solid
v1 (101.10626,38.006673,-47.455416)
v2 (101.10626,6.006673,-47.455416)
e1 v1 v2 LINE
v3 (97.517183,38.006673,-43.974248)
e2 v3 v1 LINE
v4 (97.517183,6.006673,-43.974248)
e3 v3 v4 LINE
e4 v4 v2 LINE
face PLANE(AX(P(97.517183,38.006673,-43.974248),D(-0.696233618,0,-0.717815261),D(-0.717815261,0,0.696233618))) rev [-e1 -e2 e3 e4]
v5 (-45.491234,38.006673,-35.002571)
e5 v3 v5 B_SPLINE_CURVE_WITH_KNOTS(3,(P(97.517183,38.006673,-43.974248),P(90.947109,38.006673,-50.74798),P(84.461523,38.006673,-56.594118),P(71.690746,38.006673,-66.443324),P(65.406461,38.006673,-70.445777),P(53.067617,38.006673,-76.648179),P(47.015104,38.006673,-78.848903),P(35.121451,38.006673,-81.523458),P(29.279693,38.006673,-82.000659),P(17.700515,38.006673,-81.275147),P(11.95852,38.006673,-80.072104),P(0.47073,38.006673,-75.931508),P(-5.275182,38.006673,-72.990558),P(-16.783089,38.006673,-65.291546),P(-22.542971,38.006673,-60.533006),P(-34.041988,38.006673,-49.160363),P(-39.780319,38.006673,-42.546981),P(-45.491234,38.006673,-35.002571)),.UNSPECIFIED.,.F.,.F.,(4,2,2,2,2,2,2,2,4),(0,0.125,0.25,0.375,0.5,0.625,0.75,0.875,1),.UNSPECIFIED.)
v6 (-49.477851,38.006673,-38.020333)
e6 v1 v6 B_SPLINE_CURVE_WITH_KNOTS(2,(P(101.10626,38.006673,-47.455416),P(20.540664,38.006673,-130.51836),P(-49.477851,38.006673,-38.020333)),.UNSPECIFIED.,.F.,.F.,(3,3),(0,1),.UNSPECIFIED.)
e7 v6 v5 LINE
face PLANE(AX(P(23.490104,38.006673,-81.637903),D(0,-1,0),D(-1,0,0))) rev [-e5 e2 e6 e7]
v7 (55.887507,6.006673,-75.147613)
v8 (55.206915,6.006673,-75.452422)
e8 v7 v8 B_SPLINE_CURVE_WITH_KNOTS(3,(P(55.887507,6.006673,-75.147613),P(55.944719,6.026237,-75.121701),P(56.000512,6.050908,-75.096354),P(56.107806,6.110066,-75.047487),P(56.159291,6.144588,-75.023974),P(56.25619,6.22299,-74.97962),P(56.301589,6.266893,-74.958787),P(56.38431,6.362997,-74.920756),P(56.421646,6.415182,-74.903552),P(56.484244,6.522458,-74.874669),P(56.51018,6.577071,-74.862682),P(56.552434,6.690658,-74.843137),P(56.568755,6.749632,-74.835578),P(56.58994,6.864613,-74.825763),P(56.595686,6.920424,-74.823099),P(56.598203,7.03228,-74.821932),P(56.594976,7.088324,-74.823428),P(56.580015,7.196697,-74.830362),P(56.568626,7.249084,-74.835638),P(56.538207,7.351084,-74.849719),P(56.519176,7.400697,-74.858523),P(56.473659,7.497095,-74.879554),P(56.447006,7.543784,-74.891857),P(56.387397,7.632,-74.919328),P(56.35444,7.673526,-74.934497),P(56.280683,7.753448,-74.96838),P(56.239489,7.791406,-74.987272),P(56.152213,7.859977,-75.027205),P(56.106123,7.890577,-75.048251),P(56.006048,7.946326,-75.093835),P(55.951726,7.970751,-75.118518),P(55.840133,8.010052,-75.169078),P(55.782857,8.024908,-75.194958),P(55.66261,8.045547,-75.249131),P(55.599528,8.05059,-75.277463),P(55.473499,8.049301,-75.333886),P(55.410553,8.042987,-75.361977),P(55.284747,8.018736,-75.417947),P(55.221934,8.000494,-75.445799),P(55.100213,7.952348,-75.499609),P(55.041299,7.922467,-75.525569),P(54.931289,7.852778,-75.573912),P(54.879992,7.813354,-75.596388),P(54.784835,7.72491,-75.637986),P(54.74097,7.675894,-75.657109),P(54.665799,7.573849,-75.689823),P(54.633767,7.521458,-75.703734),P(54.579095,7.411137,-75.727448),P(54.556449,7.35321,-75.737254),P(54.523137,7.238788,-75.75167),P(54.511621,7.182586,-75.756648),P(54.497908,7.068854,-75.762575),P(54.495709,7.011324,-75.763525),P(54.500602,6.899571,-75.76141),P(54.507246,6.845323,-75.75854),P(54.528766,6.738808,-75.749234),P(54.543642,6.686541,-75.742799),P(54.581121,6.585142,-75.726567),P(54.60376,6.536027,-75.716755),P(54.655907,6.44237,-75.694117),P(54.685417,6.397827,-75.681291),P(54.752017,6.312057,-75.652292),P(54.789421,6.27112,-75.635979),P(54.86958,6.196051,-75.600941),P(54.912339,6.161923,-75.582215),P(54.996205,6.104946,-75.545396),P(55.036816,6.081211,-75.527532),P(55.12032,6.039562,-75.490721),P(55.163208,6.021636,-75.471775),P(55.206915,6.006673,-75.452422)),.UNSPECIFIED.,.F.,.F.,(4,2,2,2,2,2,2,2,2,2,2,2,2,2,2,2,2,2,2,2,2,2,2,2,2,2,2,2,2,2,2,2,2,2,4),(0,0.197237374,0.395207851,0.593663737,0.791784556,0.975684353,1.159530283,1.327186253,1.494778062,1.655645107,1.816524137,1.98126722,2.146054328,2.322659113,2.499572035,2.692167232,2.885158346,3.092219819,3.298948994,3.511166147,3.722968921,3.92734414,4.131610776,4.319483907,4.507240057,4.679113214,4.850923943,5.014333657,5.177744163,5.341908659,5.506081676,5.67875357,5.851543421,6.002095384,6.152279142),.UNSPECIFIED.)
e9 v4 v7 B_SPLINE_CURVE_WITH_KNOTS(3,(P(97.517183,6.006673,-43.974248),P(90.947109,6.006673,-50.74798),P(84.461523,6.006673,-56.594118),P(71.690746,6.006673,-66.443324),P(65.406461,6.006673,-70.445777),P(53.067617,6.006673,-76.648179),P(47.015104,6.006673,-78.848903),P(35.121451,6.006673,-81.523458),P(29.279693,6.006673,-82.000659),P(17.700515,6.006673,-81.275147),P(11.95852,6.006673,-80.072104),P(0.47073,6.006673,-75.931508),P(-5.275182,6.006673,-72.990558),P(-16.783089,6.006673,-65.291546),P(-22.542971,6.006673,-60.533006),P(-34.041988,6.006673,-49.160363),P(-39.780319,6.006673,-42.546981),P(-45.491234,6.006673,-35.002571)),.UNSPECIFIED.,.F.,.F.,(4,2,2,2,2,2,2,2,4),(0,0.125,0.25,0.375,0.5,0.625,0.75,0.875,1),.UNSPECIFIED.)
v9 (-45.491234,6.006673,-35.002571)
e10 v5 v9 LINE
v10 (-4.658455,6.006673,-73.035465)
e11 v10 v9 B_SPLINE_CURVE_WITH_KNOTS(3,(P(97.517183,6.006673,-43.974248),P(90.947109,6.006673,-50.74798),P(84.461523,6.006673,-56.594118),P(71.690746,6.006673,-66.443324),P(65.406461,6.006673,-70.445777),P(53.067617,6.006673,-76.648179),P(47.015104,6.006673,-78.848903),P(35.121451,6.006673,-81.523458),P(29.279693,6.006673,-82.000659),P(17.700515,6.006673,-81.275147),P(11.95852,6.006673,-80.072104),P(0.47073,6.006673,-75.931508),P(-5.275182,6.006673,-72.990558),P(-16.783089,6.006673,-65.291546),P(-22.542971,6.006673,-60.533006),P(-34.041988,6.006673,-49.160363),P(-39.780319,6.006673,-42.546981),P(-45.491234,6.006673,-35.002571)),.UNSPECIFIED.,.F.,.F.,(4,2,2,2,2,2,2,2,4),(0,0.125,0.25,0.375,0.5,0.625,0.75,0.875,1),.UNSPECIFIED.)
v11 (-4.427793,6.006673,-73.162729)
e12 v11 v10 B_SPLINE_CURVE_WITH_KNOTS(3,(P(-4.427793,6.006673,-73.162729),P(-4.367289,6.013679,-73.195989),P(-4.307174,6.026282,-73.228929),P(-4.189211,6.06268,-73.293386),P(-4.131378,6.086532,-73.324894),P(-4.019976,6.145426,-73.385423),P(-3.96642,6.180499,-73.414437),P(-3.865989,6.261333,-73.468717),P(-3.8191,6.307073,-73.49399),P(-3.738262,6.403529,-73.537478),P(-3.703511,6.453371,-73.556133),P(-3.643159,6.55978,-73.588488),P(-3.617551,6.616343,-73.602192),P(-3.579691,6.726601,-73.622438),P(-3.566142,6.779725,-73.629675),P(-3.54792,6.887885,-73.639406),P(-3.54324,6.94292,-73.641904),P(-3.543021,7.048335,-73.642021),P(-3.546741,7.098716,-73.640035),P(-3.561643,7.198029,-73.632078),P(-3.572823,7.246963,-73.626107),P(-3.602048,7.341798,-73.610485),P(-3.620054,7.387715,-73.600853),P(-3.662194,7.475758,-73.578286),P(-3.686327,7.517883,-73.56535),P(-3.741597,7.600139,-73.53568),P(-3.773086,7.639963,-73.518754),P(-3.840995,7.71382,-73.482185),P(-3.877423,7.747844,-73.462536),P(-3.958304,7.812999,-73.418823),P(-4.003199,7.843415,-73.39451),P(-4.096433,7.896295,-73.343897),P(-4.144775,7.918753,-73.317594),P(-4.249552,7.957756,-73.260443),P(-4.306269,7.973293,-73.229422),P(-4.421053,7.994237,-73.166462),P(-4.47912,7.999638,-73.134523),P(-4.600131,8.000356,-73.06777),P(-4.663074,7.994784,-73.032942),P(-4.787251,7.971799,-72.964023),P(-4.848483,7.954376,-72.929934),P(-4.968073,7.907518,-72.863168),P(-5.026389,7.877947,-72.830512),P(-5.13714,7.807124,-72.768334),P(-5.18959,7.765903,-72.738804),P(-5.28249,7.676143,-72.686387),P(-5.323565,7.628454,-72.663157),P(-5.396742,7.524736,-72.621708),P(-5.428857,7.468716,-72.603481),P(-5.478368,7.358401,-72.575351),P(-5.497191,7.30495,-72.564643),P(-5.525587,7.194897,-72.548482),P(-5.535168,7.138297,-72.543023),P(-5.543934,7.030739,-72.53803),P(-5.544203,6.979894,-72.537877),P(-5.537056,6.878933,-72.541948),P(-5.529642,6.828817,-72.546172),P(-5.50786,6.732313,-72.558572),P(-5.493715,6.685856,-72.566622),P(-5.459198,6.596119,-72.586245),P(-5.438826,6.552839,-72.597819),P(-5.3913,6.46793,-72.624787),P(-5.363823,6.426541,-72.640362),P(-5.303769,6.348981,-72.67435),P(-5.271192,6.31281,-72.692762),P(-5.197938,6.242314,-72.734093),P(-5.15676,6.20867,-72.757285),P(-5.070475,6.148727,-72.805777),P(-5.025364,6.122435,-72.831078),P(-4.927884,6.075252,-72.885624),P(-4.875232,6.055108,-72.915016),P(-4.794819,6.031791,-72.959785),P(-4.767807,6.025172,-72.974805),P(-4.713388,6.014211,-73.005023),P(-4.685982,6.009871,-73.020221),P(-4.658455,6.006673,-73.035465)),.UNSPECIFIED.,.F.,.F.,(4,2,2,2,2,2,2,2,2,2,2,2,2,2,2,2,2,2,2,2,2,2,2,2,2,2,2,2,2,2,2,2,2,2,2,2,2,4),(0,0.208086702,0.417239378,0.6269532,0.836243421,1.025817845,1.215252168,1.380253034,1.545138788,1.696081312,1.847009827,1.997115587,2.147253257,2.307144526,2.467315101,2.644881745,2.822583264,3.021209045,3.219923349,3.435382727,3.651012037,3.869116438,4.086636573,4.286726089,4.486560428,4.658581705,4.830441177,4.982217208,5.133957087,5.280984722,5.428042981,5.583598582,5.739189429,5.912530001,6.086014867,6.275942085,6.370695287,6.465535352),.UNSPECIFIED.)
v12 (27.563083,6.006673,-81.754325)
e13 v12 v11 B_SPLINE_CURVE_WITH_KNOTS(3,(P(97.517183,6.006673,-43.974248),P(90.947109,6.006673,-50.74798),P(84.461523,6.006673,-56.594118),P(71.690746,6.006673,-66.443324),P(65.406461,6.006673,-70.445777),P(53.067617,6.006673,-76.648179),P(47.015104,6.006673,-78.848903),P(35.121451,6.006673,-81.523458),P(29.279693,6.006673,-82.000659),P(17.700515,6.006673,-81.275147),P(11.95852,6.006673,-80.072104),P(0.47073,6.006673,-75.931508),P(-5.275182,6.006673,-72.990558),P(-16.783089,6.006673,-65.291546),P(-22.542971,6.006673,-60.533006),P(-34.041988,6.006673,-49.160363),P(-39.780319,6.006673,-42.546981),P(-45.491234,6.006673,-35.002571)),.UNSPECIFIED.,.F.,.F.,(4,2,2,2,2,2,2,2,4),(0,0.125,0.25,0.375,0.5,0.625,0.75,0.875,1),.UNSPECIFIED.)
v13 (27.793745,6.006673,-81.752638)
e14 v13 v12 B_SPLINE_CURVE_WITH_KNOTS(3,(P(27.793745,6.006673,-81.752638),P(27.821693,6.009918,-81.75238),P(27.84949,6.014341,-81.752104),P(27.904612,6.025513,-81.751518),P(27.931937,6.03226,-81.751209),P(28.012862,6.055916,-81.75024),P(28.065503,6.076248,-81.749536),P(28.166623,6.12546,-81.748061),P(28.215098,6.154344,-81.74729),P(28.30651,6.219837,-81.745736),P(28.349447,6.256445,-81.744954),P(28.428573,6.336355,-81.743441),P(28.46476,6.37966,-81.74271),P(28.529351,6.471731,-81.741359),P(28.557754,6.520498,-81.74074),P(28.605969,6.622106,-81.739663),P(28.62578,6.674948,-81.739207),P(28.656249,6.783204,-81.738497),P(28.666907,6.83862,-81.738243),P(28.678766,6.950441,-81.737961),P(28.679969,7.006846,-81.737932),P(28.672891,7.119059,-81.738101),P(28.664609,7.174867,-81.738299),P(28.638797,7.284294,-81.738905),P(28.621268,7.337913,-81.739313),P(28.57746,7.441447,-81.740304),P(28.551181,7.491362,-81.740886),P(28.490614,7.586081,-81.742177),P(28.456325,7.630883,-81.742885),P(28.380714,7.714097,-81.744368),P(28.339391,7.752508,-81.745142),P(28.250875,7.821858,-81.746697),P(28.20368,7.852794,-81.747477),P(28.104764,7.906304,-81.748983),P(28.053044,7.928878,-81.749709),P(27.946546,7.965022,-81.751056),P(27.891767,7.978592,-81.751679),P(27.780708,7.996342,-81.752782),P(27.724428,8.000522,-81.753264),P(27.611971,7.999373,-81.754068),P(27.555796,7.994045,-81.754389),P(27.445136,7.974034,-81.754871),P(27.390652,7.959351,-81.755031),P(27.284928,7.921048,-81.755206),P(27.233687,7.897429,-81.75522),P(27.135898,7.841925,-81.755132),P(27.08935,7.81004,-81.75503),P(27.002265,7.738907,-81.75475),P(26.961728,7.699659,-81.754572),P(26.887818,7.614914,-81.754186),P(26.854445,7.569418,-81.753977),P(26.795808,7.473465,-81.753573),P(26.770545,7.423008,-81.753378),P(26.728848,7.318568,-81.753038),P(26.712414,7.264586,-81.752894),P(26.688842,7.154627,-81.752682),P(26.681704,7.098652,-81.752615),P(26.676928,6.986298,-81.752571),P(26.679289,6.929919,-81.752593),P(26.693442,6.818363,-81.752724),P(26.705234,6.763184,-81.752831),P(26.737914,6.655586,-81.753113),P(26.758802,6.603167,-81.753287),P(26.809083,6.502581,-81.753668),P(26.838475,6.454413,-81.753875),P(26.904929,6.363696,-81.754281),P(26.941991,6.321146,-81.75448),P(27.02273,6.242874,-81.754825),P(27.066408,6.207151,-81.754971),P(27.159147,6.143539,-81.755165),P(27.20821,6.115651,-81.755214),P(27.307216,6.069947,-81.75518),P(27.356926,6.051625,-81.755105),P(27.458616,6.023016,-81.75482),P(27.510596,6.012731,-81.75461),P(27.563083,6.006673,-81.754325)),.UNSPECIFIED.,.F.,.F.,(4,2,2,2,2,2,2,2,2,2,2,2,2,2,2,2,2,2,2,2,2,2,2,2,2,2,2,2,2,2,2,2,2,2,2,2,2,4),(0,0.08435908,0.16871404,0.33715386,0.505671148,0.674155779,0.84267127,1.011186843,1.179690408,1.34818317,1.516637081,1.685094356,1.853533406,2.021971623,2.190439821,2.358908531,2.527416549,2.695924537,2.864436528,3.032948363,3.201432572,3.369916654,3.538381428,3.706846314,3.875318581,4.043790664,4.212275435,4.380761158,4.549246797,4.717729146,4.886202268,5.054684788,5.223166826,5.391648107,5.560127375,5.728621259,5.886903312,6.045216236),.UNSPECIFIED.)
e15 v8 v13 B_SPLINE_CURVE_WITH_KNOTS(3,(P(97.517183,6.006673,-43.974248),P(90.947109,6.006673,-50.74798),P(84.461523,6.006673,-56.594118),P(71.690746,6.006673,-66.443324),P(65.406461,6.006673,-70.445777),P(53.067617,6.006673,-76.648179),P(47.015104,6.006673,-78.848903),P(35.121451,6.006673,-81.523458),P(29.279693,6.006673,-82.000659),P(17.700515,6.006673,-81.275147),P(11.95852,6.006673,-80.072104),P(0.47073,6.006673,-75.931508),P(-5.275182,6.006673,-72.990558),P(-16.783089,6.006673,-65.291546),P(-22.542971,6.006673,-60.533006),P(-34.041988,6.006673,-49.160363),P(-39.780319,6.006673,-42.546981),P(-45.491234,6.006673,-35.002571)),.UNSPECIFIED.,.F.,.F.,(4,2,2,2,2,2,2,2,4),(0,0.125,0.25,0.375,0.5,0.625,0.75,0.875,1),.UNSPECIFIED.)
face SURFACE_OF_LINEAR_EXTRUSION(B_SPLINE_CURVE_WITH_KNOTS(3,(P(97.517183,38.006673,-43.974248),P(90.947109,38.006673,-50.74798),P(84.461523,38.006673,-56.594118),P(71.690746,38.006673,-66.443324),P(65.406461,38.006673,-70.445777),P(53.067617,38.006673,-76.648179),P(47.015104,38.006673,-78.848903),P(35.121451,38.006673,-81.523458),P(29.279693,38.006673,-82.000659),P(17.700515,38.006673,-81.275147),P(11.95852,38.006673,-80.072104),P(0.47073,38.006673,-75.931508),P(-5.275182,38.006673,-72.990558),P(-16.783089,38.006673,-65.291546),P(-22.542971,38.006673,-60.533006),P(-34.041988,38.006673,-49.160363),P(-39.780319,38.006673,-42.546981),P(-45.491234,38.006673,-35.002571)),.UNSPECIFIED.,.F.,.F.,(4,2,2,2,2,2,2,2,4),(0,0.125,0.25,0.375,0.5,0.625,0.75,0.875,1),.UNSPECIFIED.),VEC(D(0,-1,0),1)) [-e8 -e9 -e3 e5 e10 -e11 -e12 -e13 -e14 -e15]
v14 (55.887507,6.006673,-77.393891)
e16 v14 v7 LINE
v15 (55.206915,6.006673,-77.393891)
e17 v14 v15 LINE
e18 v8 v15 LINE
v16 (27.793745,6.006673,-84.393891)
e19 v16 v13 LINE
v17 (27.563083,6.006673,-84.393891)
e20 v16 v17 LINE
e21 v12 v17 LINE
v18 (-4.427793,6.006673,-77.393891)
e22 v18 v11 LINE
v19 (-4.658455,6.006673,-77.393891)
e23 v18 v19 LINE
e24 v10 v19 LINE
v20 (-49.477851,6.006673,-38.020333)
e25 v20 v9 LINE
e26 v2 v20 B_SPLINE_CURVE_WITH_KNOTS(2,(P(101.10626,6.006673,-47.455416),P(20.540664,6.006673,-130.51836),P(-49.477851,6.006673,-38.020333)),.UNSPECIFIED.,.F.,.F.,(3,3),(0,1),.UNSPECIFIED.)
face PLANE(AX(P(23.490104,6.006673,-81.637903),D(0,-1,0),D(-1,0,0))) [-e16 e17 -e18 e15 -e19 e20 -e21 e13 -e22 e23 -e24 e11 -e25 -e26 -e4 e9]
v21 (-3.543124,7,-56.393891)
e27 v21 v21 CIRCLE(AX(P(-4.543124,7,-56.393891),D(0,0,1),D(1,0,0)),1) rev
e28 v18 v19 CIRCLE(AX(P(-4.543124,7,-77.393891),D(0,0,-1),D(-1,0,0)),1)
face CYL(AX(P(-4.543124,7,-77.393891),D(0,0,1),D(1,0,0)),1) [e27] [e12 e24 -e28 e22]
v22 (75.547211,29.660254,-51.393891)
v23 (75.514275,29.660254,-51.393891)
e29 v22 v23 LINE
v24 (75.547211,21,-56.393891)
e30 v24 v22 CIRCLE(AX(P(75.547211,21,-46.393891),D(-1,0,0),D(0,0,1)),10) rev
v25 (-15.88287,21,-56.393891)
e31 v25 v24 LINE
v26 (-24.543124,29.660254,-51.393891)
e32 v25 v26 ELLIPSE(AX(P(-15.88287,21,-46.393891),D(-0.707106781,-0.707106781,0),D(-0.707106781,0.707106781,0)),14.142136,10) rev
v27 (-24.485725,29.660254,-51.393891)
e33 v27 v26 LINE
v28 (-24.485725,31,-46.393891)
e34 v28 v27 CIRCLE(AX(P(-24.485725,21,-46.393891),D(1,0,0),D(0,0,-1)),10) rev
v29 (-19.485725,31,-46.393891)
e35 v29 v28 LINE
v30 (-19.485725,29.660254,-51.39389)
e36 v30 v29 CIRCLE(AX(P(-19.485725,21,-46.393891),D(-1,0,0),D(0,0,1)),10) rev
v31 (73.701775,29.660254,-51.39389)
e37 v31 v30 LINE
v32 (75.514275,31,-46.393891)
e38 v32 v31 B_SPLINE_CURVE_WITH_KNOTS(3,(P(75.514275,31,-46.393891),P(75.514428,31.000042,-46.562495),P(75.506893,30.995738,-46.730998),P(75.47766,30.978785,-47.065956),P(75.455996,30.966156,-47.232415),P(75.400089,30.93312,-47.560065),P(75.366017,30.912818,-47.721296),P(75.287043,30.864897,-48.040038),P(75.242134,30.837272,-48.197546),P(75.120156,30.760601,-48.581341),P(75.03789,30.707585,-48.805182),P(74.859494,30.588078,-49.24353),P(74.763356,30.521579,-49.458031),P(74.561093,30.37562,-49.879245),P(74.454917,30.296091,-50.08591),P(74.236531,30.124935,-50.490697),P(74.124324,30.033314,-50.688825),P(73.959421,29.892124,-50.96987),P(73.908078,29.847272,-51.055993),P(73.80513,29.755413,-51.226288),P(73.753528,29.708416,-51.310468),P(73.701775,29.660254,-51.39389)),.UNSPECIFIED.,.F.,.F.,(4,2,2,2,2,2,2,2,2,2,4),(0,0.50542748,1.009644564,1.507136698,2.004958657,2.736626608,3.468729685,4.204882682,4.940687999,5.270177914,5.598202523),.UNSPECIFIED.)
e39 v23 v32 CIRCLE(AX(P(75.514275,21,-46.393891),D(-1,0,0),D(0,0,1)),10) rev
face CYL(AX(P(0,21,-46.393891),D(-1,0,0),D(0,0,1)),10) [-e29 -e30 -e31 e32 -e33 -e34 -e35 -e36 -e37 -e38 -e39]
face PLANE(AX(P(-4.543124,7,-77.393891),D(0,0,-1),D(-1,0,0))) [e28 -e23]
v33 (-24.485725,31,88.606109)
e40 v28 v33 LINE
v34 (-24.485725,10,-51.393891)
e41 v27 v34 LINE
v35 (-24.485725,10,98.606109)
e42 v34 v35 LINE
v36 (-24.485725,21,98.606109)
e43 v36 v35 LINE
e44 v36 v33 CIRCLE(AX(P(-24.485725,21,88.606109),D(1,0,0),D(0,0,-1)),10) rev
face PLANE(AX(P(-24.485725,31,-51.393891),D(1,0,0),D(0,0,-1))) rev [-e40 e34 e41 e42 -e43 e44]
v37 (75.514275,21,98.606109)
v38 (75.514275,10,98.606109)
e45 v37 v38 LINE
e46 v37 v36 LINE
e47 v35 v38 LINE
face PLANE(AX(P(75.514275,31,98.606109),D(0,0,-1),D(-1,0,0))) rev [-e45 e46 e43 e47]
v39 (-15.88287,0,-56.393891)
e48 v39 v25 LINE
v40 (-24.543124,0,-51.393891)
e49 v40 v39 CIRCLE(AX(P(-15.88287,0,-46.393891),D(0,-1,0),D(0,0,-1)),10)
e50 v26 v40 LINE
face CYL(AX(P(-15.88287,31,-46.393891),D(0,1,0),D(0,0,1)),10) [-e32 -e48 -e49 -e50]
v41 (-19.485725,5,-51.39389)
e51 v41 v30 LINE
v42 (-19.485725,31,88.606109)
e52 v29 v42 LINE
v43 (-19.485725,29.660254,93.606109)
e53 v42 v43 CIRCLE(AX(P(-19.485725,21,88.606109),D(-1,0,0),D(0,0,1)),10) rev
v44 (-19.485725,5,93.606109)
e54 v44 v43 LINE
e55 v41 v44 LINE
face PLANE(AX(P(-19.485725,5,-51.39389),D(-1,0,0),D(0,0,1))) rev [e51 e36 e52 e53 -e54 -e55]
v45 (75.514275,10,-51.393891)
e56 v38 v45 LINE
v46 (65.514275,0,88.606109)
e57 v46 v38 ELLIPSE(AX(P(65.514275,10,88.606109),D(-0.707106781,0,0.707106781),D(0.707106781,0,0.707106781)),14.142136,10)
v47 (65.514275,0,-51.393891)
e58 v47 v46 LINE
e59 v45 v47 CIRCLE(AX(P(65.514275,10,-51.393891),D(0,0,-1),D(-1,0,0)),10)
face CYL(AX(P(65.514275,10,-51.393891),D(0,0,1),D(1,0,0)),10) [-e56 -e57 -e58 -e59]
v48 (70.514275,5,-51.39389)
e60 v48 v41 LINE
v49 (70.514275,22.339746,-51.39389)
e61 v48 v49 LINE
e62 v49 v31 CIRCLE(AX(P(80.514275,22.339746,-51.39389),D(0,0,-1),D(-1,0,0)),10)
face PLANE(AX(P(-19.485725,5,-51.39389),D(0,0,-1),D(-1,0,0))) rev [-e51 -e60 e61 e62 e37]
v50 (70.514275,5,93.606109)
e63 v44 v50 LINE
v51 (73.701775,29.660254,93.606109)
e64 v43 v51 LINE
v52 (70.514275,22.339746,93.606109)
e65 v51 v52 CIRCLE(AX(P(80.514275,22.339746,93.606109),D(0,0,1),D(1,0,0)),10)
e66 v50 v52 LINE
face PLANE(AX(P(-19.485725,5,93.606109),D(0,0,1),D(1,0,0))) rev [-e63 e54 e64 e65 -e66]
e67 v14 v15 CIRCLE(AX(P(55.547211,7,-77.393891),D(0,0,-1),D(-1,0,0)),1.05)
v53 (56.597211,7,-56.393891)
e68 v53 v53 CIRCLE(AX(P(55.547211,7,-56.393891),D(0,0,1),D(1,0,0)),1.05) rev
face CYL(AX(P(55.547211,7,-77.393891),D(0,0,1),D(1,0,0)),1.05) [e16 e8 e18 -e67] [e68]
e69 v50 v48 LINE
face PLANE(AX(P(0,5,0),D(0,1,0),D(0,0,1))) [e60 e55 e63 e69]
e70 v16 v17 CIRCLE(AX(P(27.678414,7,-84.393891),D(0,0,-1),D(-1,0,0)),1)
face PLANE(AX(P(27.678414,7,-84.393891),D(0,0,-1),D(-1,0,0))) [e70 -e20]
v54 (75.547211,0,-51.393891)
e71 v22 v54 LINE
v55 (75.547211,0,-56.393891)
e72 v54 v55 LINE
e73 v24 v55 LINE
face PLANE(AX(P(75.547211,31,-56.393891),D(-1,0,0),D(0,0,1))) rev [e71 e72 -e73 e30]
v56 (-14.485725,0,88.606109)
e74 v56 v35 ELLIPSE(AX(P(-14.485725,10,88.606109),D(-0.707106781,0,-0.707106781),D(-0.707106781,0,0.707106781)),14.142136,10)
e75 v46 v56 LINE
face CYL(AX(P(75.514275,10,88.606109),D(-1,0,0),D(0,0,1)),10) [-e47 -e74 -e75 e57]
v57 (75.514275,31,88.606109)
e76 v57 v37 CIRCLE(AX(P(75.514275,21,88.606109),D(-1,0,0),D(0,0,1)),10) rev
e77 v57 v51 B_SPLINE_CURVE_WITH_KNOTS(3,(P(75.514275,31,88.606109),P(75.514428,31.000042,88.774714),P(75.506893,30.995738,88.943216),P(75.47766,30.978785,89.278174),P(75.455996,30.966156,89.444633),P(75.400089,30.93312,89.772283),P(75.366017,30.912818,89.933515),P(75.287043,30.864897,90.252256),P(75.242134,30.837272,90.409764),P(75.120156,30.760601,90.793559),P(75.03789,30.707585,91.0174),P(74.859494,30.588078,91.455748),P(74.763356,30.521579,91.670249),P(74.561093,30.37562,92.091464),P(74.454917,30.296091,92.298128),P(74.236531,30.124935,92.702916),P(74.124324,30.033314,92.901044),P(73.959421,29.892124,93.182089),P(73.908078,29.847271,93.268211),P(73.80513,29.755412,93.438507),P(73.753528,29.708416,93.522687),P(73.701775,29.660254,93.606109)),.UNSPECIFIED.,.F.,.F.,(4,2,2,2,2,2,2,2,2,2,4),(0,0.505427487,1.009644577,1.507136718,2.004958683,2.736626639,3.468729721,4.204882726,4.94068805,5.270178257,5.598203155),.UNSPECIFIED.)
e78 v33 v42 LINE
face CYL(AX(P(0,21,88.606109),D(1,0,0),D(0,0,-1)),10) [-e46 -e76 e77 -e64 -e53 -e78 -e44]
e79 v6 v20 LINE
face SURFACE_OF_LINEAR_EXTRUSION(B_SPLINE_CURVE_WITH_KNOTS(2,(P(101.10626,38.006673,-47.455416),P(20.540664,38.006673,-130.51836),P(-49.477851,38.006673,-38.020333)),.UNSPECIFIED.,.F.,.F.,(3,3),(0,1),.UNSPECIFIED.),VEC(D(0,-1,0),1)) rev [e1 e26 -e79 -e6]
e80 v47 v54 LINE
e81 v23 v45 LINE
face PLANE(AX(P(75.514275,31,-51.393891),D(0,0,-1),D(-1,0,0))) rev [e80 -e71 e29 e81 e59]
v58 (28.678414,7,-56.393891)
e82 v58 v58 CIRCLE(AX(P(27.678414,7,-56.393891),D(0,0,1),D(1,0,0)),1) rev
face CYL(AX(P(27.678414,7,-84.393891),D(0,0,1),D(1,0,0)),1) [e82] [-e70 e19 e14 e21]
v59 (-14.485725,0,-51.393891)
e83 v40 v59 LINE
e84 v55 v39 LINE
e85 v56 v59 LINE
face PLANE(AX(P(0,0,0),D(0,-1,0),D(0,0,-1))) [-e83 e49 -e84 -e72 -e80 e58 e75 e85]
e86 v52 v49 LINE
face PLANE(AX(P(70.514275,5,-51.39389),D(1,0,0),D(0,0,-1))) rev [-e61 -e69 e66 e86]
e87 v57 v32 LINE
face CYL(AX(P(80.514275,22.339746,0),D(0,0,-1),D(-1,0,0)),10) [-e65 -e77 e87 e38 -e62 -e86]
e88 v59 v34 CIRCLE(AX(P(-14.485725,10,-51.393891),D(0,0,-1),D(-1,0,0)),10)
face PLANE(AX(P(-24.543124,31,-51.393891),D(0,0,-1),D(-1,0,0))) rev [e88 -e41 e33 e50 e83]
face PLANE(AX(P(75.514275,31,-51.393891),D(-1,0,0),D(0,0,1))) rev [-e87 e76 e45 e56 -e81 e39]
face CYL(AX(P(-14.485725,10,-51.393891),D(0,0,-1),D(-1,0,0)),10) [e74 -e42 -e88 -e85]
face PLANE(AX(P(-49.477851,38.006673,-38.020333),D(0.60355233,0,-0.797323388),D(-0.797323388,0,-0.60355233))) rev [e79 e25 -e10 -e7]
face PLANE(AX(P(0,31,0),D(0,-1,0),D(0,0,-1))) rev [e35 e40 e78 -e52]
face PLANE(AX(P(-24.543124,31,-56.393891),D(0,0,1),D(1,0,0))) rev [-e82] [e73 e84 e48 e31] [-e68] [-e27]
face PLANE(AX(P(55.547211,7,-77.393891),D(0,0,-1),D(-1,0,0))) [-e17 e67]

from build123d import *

# Parameters (mm, degrees)
BOSS_EXTRUDE1_DEPTH = 31
SKETCH5_W           = 90
SKETCH5_H           = 144.999999519
CUT_EXTRUDE2_DEPTH  = 26
SKETCH10_R          = 1.05
SKETCH10_R_2        = 1
BOSS_EXTRUDE3_DEPTH = 21
EXTRUDE_THIN2_START = -32
EXTRUDE_THIN2_DEPTH = 32
FILLET2_R           = 10
FILLET4_R           = 10
FILLET5_R           = 10
FILLET6_R           = 10
SKETCH15_R          = 1
BOSS_EXTRUDE4_DEPTH = 28


# Read off the part's stored shape, not the designer's step: Extrude-Thin2
with BuildPart() as part:
    # Sketch4 → Boss-Extrude1 (new body)
    with BuildSketch(Plane(origin=(0, 0, 0), x_dir=(1, 0, 0), z_dir=(0, 1, 0))):
        Polygon((-24.543123589, 51.393890829), (-24.485724986, 51.393890829), (-24.485724986, -98.606109173), (75.514275014, -98.606109173), (75.514275014, 51.393890827), (75.547211032, 51.393890827), (75.547211032, 56.393890829), (-24.543123589, 56.393890829), align=None)
    extrude(amount=BOSS_EXTRUDE1_DEPTH)

    # Sketch5 → Cut-Extrude2 (cut)
    with BuildSketch(Plane(origin=(0, 31, 0), x_dir=(1, 0, 0), z_dir=(0, 1, 0))):
        with Locations((25.514275014, -21.106109414)):
            Rectangle(SKETCH5_W, SKETCH5_H)
    extrude(amount=-CUT_EXTRUDE2_DEPTH, mode=Mode.SUBTRACT)

    # Sketch10 → Boss-Extrude3 (add)
    with BuildSketch(Plane(origin=(0, 0, -56.393890829), x_dir=(-1, 0, 0), z_dir=(0, 0, -1))):
        with Locations(Location((-55.547211032, 7, 0), (0, 0, 180))):
            Circle(SKETCH10_R)
        with Locations(Location((4.543123589, 7, 0), (0, 0, 180))):
            Circle(SKETCH10_R_2)
    extrude(amount=BOSS_EXTRUDE3_DEPTH)

    # Fillet2
    # the kernel refuses this fillet: 10 mm, written as the material it takes off along each edge
    with BuildSketch(Plane(origin=(-49.485724986, 31, 98.606109173), x_dir=(0, 0, -1), z_dir=(1, 0, 0))) as fillet2_piece_1:
        with BuildLine():
            CenterArc((FILLET2_R, -FILLET2_R), FILLET2_R, 90, 90)
            Line((0, -FILLET2_R), (0, 0))
            Line((0, 0), (FILLET2_R, 0))
        make_face()
    extrude(amount=150, mode=Mode.SUBTRACT)
    with BuildSketch(Plane(origin=(-24.485724986, 0, -51.393890829), x_dir=(0, 1, 0), z_dir=(0, 0, 1))) as fillet2_piece_2:
        with BuildLine():
            CenterArc((FILLET2_R, -FILLET2_R), FILLET2_R, 90, 90)
            Line((0, -FILLET2_R), (0, 0))
            Line((0, 0), (FILLET2_R, 0))
        make_face()
    extrude(amount=175.000000002, mode=Mode.SUBTRACT)
    with BuildSketch(Plane(origin=(-49.485724986, 0, 98.606109173), x_dir=(0, 0, -1), z_dir=(1, 0, 0))) as fillet2_piece_3:
        with BuildLine():
            CenterArc((FILLET2_R, FILLET2_R), FILLET2_R, 180, 90)
            Line((0, FILLET2_R), (0, 0))
            Line((0, 0), (FILLET2_R, 0))
        make_face()
    extrude(amount=150, mode=Mode.SUBTRACT)
    with BuildSketch(Plane(origin=(75.514275014, 0, 123.606109173), x_dir=(-1, 0, 0), z_dir=(0, 0, -1))) as fillet2_piece_4:
        with BuildLine():
            CenterArc((FILLET2_R, FILLET2_R), FILLET2_R, 180, 90)
            Line((0, FILLET2_R), (0, 0))
            Line((0, 0), (FILLET2_R, 0))
        make_face()
    extrude(amount=175, mode=Mode.SUBTRACT)

    # Fillet4
    # the kernel refuses this fillet: 10 mm, written as the material it takes off along each edge
    with BuildSketch(Plane(origin=(70.514275014, 31, -73.044525441), x_dir=(0, -1, 0), z_dir=(0, 0, 1))) as fillet4_piece_1_section:
        with BuildLine():
            CenterArc((8.660254038, 10), FILLET4_R, 210, 60)
            Line((0, 5), (0, 0))
            Line((0, 0), (8.660254038, 0))
        make_face()
    fillet4_piece_1 = extrude(amount=183.301269709, mode=Mode.PRIVATE)
    fillet4_piece_1 = split(fillet4_piece_1, bisect_by=Plane(origin=(71.836700468, 27.349745962, -51.393890827), z_dir=(0, 0, 1)), keep=Keep.TOP, mode=Mode.PRIVATE)
    fillet4_piece_1 = split(fillet4_piece_1, bisect_by=Plane(origin=(71.836700468, 27.349745962, 93.606109173), z_dir=(0, 0, -1)), keep=Keep.TOP, mode=Mode.PRIVATE)
    add(fillet4_piece_1, mode=Mode.SUBTRACT)

    # Fillet5
    # the kernel refuses this fillet: 10 mm, written as the material it takes off along each edge
    with BuildSketch(Plane(origin=(100.547211032, 31, -56.393890829), x_dir=(0, -1, 0), z_dir=(-1, 0, 0))) as fillet5_piece_1:
        with BuildLine():
            CenterArc((FILLET5_R, FILLET5_R), FILLET5_R, 180, 90)
            Line((0, FILLET5_R), (0, 0))
            Line((0, 0), (FILLET5_R, 0))
        make_face()
    extrude(amount=150.090334621, mode=Mode.SUBTRACT)

    # Fillet6
    # the kernel refuses this fillet: 10 mm, written as the material it takes off along each edge
    with BuildSketch(Plane(origin=(-24.543123589, -21.650635095, -56.393890829), x_dir=(0, 0, 1), z_dir=(0, 1, 0))) as fillet6_piece_1:
        with BuildLine():
            CenterArc((10, 8.660254038), FILLET6_R, 180, 60)
            Line((0, 8.660254038), (-0.2, 8.660254038))
            Line((-0.2, 8.660254038), (-0.2, 0))
            Line((-0.2, 0), (0, -0.2))
            ThreePointArc((0, -0.2), (2.5, -0.2), (4.9, -0.173205081))
            Line((4.9, -0.173205081), (5, 0))
        make_face()
    extrude(amount=64.301270189, mode=Mode.SUBTRACT)



with BuildPart() as body_2:
    # Extrude-Thin2 outline → Extrude-Thin2 (new body)
    with BuildSketch(Plane(origin=(0, 6.00667288, 0), x_dir=(-1, 0, 0), z_dir=(0, -1, 0)).offset(EXTRUDE_THIN2_START)):
        with BuildLine():
            Line((-101.106259616, 47.455416484), (-97.517183312, 43.974248393))
            add(Edge.make_bspline(
                [(-97.517183312, 43.974248393), (-90.947109033, 50.747979881), (-84.461523265, 56.594117718), (-71.690746068, 66.443323609), (-65.406461275, 70.445777381), (-53.067617331, 76.648178617), (-47.015104027, 78.848903051), (-35.121450693, 81.523458331), (-29.279693001, 82.000658953), (-17.700514878, 81.275147368), (-11.958520381, 80.072104414), (-0.470729692, 75.931508258), (5.275181576, 72.990557795), (16.783088845, 65.291546287), (22.542970532, 60.533005936), (34.041987864, 49.160363108), (39.780319498, 42.546980543), (45.491234369, 35.002570947)],
                knots=[0, 0, 0, 0, 0.125, 0.125, 0.25, 0.25, 0.375, 0.375, 0.5, 0.5, 0.625, 0.625, 0.75, 0.75, 0.875, 0.875, 1, 1, 1, 1], degree=3))
            Line((45.491234369, 35.002570947), (49.477851308, 38.020332599))
            add(Edge.make_bspline(
                [(-101.106259616, 47.455416484), (-20.540664315, 130.518360158), (49.477851308, 38.020332599)],
                knots=[0, 0, 0, 1, 1, 1], degree=2))
        make_face()
    extrude(amount=EXTRUDE_THIN2_DEPTH)


with BuildPart() as part_1:
    add(part.part)

    add(body_2.part)  # Boss-Extrude4 merges body 2
    # Sketch15 → Boss-Extrude4 (add)
    with BuildSketch(Plane(origin=(0, 0, -56.393890829), x_dir=(-1, 0, 0), z_dir=(0, 0, -1))):
        with Locations(Location((-27.678413699, 7, 0), (0, 0, 180))):
            Circle(SKETCH15_R)
    extrude(amount=BOSS_EXTRUDE4_DEPTH)


solid = part_1.part
